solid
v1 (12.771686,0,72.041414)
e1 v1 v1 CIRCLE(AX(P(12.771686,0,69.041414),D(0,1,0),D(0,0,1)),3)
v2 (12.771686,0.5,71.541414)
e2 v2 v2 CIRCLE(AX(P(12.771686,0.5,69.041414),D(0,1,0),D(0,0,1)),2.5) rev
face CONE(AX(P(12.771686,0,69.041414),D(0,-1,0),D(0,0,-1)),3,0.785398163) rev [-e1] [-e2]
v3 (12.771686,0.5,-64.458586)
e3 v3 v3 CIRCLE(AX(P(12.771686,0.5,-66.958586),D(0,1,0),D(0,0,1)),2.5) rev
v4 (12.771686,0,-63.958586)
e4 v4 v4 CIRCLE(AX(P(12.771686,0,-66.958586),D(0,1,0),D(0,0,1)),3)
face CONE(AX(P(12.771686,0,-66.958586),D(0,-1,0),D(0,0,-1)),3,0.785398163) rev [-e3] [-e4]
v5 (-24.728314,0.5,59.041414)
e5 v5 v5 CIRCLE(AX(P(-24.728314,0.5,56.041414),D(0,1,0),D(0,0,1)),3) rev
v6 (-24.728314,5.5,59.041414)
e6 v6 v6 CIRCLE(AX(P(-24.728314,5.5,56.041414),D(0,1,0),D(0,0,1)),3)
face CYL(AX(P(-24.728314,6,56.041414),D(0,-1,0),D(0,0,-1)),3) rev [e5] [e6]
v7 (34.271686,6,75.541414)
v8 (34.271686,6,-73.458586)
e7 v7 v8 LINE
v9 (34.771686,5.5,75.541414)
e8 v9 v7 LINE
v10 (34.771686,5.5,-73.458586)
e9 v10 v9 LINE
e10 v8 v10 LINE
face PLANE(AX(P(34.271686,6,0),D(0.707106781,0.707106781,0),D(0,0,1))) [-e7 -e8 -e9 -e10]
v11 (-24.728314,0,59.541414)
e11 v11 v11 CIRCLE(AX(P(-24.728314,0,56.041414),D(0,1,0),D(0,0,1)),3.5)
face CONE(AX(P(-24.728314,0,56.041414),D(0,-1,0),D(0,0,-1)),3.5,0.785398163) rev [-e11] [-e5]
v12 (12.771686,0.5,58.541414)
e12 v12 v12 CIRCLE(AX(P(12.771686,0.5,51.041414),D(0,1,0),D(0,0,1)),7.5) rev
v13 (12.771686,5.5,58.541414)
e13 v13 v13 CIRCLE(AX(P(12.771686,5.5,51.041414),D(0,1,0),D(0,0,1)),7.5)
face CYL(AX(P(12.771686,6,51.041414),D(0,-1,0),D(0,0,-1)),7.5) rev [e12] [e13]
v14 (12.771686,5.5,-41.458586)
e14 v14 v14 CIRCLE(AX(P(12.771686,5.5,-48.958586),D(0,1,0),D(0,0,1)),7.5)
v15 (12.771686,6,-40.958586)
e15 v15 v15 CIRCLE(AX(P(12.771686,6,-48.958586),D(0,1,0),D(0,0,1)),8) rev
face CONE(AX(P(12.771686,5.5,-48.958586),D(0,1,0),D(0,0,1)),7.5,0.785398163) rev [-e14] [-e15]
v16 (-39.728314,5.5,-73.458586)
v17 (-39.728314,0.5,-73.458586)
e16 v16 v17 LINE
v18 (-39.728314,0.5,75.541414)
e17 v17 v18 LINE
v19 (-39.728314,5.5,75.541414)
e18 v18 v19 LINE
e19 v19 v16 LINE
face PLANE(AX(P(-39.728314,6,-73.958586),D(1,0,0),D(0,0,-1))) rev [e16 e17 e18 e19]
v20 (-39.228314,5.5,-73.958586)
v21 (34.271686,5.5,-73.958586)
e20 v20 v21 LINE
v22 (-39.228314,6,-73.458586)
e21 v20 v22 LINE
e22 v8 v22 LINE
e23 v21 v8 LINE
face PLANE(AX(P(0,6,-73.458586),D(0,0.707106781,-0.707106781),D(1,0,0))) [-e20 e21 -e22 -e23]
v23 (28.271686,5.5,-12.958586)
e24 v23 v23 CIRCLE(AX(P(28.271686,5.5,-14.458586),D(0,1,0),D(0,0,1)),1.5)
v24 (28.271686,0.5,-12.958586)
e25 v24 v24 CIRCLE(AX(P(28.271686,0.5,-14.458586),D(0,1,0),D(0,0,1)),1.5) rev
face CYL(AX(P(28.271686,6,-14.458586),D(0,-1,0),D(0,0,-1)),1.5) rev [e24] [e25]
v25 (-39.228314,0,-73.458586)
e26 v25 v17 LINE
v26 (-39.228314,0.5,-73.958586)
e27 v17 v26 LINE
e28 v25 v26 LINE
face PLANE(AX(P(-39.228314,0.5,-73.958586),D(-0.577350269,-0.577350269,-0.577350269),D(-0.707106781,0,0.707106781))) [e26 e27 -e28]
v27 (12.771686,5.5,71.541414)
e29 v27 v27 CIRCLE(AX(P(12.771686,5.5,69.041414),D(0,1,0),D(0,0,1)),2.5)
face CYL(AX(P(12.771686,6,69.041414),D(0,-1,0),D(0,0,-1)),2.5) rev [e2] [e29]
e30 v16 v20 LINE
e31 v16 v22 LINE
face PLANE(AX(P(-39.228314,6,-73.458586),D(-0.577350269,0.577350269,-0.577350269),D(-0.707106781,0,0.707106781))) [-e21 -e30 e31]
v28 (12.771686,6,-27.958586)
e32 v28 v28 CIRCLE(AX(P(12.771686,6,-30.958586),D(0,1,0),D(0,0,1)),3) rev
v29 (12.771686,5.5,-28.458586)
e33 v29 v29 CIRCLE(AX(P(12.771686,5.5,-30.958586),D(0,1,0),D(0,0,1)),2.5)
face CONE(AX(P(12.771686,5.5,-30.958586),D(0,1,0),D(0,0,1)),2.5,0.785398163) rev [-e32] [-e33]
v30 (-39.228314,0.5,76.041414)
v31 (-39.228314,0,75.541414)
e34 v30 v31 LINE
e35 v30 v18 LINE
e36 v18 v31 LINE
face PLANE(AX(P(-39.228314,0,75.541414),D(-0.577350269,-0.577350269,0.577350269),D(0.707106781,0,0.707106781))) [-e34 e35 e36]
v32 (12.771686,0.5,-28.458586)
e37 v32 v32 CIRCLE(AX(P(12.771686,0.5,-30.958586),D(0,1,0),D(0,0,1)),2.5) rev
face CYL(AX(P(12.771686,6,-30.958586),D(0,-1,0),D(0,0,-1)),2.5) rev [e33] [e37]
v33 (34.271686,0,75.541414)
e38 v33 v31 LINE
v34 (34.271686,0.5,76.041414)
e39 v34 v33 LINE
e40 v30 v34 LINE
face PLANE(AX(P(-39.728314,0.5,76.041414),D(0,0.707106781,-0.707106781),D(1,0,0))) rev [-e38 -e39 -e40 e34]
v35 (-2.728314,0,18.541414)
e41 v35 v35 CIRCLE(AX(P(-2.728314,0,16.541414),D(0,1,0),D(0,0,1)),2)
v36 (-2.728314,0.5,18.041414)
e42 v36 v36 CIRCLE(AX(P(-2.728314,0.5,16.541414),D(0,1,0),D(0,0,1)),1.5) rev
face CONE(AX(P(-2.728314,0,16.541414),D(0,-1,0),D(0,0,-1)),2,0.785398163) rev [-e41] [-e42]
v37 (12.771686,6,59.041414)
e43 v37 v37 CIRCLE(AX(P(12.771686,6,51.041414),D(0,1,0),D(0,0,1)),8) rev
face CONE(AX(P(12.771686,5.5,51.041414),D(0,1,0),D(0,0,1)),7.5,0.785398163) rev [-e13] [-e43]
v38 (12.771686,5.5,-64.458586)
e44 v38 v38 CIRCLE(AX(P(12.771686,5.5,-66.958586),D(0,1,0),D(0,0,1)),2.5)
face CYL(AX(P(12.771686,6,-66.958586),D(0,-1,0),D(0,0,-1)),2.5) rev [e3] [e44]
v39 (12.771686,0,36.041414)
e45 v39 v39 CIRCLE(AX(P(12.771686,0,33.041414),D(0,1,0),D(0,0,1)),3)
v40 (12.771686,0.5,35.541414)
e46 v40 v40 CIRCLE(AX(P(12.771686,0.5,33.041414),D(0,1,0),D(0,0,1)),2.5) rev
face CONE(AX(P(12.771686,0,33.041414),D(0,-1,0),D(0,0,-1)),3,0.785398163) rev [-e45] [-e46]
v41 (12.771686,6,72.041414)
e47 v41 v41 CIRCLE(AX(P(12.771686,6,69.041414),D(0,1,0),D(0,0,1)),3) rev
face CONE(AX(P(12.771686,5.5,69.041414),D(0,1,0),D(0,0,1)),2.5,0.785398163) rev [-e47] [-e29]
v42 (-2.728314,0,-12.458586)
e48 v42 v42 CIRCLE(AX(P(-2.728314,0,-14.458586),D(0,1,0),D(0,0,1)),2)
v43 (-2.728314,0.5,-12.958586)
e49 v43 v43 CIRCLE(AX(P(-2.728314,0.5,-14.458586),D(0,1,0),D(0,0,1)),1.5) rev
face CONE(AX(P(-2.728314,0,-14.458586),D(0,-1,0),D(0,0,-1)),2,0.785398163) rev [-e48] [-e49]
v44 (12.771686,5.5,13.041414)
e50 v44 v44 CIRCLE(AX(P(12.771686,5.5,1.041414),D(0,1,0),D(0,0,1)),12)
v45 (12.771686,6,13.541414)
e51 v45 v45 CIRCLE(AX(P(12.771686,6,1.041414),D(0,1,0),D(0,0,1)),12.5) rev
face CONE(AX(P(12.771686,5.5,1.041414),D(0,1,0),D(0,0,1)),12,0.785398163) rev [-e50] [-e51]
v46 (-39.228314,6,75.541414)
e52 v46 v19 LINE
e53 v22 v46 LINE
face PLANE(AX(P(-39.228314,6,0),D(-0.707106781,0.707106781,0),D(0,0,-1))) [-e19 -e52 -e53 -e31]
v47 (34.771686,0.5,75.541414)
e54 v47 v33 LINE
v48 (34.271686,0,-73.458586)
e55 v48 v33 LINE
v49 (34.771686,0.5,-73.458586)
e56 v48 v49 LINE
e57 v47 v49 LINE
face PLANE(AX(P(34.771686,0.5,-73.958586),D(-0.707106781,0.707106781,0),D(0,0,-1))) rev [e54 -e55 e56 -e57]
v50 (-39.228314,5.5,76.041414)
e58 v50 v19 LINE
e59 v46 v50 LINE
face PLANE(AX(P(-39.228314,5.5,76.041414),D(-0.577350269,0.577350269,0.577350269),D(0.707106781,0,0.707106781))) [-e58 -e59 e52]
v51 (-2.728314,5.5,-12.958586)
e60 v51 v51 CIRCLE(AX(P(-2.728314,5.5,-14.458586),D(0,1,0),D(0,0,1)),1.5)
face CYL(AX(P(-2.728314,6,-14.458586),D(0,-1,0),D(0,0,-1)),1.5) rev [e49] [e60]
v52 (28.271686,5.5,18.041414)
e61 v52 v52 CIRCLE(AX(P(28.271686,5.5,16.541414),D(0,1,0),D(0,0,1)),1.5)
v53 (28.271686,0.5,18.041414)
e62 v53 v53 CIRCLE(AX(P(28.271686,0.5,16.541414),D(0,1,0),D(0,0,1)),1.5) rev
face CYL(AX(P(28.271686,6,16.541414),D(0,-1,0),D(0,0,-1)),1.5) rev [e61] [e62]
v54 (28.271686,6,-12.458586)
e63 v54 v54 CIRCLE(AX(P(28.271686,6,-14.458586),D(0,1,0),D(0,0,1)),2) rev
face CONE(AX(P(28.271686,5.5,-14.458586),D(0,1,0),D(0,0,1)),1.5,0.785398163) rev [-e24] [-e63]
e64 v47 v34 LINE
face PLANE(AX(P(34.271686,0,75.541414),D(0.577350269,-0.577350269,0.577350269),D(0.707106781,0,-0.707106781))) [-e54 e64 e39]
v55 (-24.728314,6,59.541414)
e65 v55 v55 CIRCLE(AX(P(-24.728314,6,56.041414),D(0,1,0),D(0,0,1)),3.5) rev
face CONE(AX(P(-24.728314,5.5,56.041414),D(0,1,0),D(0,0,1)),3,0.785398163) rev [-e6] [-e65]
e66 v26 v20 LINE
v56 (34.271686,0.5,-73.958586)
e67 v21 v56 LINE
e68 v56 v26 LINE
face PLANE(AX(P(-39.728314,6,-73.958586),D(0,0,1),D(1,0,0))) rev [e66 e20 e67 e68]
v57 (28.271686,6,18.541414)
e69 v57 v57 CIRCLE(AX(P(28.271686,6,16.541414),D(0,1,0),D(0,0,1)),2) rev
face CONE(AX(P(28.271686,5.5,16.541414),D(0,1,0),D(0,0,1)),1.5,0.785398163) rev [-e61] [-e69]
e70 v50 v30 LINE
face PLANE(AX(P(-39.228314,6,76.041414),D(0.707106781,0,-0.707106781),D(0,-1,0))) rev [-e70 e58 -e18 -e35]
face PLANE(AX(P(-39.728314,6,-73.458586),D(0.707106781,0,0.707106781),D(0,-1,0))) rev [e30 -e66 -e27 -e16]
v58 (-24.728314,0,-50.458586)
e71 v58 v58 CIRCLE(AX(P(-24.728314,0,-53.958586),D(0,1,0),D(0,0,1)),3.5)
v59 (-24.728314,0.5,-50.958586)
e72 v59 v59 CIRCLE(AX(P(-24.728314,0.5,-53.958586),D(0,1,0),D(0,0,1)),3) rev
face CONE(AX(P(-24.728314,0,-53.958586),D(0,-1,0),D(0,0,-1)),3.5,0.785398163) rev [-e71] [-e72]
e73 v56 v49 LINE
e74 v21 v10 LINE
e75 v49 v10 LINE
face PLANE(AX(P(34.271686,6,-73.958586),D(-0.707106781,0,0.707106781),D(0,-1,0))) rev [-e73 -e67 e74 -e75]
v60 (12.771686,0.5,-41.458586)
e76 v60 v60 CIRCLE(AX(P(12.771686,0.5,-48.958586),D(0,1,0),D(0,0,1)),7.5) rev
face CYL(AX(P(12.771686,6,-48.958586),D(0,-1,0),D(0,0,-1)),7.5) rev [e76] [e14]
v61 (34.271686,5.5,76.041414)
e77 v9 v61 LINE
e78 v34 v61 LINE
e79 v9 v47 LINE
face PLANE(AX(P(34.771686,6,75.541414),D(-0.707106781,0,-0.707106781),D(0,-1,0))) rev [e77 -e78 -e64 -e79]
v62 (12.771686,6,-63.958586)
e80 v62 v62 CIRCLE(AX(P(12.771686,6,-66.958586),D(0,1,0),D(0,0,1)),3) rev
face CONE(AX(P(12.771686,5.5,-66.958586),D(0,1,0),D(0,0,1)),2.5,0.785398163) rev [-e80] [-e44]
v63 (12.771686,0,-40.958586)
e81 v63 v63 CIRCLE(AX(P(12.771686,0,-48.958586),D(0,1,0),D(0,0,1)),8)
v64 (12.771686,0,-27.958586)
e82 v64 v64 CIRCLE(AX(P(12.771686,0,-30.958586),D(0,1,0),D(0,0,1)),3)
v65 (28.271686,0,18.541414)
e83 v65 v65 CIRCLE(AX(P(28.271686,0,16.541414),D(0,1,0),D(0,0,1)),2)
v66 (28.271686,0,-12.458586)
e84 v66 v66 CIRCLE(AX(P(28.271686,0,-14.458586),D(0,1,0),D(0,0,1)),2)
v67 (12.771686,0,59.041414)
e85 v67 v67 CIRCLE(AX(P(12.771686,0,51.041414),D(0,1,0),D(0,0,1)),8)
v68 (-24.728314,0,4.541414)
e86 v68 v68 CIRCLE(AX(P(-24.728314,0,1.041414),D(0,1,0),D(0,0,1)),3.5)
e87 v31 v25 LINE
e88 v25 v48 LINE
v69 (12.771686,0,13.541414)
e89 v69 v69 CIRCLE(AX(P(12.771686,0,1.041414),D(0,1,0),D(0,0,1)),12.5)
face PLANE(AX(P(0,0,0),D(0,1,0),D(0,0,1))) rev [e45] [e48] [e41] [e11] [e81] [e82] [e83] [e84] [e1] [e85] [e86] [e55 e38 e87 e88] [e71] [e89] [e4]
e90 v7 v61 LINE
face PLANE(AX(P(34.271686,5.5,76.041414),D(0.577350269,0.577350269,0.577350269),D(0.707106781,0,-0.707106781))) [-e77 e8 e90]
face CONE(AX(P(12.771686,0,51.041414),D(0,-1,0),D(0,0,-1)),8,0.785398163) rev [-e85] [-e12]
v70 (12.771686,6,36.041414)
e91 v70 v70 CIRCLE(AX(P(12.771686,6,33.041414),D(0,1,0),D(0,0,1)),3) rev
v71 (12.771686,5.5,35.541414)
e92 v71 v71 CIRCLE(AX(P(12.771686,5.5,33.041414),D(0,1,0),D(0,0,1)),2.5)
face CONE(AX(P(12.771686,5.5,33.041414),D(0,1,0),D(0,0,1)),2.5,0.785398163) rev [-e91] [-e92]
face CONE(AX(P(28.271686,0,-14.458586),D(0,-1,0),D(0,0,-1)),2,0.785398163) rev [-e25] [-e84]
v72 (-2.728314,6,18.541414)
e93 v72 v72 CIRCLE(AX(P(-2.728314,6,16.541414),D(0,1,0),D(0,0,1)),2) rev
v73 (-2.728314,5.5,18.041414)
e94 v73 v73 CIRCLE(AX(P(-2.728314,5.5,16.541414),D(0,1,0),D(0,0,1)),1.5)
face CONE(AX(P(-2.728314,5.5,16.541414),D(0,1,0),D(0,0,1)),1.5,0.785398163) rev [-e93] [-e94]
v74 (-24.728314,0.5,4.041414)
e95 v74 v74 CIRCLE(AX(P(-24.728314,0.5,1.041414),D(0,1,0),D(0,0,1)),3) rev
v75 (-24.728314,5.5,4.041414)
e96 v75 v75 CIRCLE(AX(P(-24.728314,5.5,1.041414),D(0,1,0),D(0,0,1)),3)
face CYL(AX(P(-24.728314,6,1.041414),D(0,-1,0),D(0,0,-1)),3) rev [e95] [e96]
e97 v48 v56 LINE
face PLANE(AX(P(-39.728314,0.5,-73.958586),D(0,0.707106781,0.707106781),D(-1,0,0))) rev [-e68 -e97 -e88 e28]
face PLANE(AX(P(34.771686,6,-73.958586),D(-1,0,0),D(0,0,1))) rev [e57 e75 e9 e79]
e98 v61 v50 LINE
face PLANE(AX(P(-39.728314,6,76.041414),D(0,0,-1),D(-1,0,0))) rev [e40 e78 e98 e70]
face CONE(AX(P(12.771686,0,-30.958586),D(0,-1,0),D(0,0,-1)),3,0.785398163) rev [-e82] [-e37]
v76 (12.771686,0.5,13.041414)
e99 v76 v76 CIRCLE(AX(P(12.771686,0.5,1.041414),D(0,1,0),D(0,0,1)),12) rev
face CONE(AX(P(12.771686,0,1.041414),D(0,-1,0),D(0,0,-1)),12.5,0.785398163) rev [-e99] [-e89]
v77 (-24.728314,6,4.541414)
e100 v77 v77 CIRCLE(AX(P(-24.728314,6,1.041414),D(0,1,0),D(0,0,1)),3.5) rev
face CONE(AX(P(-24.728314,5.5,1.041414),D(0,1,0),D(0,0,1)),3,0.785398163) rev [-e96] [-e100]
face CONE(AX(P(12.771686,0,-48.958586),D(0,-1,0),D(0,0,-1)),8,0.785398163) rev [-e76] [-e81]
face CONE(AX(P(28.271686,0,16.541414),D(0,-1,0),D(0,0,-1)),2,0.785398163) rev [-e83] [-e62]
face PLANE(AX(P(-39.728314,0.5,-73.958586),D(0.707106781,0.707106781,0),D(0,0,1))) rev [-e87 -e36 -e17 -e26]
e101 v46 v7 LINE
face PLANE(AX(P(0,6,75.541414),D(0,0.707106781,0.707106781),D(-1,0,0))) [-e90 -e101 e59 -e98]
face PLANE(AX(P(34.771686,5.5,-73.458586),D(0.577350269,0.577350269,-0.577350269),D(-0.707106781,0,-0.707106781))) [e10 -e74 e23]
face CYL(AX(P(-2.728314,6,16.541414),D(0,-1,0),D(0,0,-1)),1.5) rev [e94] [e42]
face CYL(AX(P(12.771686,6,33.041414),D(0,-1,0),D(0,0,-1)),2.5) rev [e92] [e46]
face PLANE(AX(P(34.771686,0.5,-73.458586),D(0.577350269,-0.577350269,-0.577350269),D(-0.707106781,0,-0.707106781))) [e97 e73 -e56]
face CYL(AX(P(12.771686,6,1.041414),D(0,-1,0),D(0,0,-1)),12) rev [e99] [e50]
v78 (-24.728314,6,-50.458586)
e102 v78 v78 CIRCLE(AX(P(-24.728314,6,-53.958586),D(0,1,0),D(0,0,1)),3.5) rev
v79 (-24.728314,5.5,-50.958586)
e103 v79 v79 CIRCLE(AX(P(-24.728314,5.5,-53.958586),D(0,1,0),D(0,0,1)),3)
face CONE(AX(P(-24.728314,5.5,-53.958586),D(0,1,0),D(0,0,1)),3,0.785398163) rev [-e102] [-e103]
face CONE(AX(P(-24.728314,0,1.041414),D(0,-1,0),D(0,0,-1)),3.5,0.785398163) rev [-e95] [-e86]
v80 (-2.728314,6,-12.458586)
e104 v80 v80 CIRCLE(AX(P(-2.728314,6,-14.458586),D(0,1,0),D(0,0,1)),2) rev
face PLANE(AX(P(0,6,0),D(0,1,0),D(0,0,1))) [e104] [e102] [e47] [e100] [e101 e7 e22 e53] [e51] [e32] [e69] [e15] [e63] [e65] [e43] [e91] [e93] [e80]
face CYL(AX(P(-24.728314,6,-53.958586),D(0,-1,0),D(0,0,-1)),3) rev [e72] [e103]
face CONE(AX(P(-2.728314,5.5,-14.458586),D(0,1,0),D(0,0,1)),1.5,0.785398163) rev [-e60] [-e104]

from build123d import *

# Parameters (mm, degrees)
CROQUIS1_W              = 74.5
CROQUIS1_H              = 150
CROQUIS1_R              = 1.5
CROQUIS1_R_2            = 3
CROQUIS1_R_3            = 12
CROQUIS1_R_4            = 7.5
CROQUIS1_R_5            = 2.5
SALIENTE_EXTRUIR1_DEPTH = 6
CHAFL_N1_SIZE           = 0.5


with BuildPart() as part:
    # Croquis1 → Saliente-Extruir1 (new body)
    with BuildSketch(Plane(origin=(0, 0, 0), x_dir=(1, 0, 0), z_dir=(0, 1, 0))):
        with Locations((-2.478313692, -1.041413592)):
            Rectangle(CROQUIS1_W, CROQUIS1_H)
        with Locations((-2.728313692, 14.458586408)):
            Circle(CROQUIS1_R, mode=Mode.SUBTRACT)
        with Locations((28.271686308, 14.458586408)):
            Circle(CROQUIS1_R, mode=Mode.SUBTRACT)
        with Locations((-2.728313692, -16.541413592)):
            Circle(CROQUIS1_R, mode=Mode.SUBTRACT)
        with Locations((28.271686308, -16.541413592)):
            Circle(CROQUIS1_R, mode=Mode.SUBTRACT)
        with Locations((-24.728313692, 53.958586408)):
            Circle(CROQUIS1_R_2, mode=Mode.SUBTRACT)
        with Locations((-24.728313692, -56.041413592)):
            Circle(CROQUIS1_R_2, mode=Mode.SUBTRACT)
        with Locations((12.771686308, -1.041413592)):
            Circle(CROQUIS1_R_3, mode=Mode.SUBTRACT)
        with Locations((-24.728313692, -1.041413592)):
            Circle(CROQUIS1_R_2, mode=Mode.SUBTRACT)
        with Locations((12.771686308, -51.041413592)):
            Circle(CROQUIS1_R_4, mode=Mode.SUBTRACT)
        with Locations((12.771686308, 48.958586408)):
            Circle(CROQUIS1_R_4, mode=Mode.SUBTRACT)
        with Locations((12.771686308, 66.958586408)):
            Circle(CROQUIS1_R_5, mode=Mode.SUBTRACT)
        with Locations((12.771686308, 30.958586408)):
            Circle(CROQUIS1_R_5, mode=Mode.SUBTRACT)
        with Locations((12.771686308, -33.041413592)):
            Circle(CROQUIS1_R_5, mode=Mode.SUBTRACT)
        with Locations((12.771686308, -69.041413592)):
            Circle(CROQUIS1_R_5, mode=Mode.SUBTRACT)
    extrude(amount=SALIENTE_EXTRUIR1_DEPTH)

    # Chaflán1
    chafl_n1_edges = [part.edges().sort_by_distance(p)[0] for p in [
        (26.771686308, 0, 16.541413592),
        (26.771686308, 0, -14.458586408),
        (-4.228313692, 0, -14.458586408),
        (-4.228313692, 0, 16.541413592),
        (26.771686308, 6, 16.541413592),
        (26.771686308, 6, -14.458586408),
        (-39.728313692, 3, -73.958586408),
        (-39.728313692, 3, 76.041413592),
        (34.771686308, 3, 76.041413592),
        (-2.478313692, 0, 76.041413592),
        (34.771686308, 0, 1.041413592),
        (-39.728313692, 0, 1.041413592),
        (-2.478313692, 0, -73.958586408),
        (34.771686308, 3, -73.958586408),
        (-2.478313692, 6, -73.958586408),
        (34.771686308, 6, 1.041413592),
        (-2.478313692, 6, 76.041413592),
        (-39.728313692, 6, 1.041413592),
        (-4.228313692, 6, -14.458586408),
        (-4.228313692, 6, 16.541413592),
        (-27.728313692, 0, 56.041413592),
        (-27.728313692, 0, -53.958586408),
        (-27.728313692, 6, 56.041413592),
        (-27.728313692, 6, -53.958586408),
        (0.771686308, 0, 1.041413592),
        (0.771686308, 6, 1.041413592),
        (5.271686308, 0, -48.958586408),
        (-27.728313692, 0, 1.041413592),
        (5.271686308, 0, 51.041413592),
        (5.271686308, 6, -48.958586408),
        (-27.728313692, 6, 1.041413592),
        (5.271686308, 6, 51.041413592),
        (10.271686308, 0, 69.041413592),
        (10.271686308, 0, -30.958586408),
        (10.271686308, 0, -66.958586408),
        (10.271686308, 0, 33.041413592),
        (10.271686308, 6, 69.041413592),
        (10.271686308, 6, -30.958586408),
        (10.271686308, 6, -66.958586408),
        (10.271686308, 6, 33.041413592),
    ]]
    chamfer(chafl_n1_edges, length=CHAFL_N1_SIZE)


solid = part.part
